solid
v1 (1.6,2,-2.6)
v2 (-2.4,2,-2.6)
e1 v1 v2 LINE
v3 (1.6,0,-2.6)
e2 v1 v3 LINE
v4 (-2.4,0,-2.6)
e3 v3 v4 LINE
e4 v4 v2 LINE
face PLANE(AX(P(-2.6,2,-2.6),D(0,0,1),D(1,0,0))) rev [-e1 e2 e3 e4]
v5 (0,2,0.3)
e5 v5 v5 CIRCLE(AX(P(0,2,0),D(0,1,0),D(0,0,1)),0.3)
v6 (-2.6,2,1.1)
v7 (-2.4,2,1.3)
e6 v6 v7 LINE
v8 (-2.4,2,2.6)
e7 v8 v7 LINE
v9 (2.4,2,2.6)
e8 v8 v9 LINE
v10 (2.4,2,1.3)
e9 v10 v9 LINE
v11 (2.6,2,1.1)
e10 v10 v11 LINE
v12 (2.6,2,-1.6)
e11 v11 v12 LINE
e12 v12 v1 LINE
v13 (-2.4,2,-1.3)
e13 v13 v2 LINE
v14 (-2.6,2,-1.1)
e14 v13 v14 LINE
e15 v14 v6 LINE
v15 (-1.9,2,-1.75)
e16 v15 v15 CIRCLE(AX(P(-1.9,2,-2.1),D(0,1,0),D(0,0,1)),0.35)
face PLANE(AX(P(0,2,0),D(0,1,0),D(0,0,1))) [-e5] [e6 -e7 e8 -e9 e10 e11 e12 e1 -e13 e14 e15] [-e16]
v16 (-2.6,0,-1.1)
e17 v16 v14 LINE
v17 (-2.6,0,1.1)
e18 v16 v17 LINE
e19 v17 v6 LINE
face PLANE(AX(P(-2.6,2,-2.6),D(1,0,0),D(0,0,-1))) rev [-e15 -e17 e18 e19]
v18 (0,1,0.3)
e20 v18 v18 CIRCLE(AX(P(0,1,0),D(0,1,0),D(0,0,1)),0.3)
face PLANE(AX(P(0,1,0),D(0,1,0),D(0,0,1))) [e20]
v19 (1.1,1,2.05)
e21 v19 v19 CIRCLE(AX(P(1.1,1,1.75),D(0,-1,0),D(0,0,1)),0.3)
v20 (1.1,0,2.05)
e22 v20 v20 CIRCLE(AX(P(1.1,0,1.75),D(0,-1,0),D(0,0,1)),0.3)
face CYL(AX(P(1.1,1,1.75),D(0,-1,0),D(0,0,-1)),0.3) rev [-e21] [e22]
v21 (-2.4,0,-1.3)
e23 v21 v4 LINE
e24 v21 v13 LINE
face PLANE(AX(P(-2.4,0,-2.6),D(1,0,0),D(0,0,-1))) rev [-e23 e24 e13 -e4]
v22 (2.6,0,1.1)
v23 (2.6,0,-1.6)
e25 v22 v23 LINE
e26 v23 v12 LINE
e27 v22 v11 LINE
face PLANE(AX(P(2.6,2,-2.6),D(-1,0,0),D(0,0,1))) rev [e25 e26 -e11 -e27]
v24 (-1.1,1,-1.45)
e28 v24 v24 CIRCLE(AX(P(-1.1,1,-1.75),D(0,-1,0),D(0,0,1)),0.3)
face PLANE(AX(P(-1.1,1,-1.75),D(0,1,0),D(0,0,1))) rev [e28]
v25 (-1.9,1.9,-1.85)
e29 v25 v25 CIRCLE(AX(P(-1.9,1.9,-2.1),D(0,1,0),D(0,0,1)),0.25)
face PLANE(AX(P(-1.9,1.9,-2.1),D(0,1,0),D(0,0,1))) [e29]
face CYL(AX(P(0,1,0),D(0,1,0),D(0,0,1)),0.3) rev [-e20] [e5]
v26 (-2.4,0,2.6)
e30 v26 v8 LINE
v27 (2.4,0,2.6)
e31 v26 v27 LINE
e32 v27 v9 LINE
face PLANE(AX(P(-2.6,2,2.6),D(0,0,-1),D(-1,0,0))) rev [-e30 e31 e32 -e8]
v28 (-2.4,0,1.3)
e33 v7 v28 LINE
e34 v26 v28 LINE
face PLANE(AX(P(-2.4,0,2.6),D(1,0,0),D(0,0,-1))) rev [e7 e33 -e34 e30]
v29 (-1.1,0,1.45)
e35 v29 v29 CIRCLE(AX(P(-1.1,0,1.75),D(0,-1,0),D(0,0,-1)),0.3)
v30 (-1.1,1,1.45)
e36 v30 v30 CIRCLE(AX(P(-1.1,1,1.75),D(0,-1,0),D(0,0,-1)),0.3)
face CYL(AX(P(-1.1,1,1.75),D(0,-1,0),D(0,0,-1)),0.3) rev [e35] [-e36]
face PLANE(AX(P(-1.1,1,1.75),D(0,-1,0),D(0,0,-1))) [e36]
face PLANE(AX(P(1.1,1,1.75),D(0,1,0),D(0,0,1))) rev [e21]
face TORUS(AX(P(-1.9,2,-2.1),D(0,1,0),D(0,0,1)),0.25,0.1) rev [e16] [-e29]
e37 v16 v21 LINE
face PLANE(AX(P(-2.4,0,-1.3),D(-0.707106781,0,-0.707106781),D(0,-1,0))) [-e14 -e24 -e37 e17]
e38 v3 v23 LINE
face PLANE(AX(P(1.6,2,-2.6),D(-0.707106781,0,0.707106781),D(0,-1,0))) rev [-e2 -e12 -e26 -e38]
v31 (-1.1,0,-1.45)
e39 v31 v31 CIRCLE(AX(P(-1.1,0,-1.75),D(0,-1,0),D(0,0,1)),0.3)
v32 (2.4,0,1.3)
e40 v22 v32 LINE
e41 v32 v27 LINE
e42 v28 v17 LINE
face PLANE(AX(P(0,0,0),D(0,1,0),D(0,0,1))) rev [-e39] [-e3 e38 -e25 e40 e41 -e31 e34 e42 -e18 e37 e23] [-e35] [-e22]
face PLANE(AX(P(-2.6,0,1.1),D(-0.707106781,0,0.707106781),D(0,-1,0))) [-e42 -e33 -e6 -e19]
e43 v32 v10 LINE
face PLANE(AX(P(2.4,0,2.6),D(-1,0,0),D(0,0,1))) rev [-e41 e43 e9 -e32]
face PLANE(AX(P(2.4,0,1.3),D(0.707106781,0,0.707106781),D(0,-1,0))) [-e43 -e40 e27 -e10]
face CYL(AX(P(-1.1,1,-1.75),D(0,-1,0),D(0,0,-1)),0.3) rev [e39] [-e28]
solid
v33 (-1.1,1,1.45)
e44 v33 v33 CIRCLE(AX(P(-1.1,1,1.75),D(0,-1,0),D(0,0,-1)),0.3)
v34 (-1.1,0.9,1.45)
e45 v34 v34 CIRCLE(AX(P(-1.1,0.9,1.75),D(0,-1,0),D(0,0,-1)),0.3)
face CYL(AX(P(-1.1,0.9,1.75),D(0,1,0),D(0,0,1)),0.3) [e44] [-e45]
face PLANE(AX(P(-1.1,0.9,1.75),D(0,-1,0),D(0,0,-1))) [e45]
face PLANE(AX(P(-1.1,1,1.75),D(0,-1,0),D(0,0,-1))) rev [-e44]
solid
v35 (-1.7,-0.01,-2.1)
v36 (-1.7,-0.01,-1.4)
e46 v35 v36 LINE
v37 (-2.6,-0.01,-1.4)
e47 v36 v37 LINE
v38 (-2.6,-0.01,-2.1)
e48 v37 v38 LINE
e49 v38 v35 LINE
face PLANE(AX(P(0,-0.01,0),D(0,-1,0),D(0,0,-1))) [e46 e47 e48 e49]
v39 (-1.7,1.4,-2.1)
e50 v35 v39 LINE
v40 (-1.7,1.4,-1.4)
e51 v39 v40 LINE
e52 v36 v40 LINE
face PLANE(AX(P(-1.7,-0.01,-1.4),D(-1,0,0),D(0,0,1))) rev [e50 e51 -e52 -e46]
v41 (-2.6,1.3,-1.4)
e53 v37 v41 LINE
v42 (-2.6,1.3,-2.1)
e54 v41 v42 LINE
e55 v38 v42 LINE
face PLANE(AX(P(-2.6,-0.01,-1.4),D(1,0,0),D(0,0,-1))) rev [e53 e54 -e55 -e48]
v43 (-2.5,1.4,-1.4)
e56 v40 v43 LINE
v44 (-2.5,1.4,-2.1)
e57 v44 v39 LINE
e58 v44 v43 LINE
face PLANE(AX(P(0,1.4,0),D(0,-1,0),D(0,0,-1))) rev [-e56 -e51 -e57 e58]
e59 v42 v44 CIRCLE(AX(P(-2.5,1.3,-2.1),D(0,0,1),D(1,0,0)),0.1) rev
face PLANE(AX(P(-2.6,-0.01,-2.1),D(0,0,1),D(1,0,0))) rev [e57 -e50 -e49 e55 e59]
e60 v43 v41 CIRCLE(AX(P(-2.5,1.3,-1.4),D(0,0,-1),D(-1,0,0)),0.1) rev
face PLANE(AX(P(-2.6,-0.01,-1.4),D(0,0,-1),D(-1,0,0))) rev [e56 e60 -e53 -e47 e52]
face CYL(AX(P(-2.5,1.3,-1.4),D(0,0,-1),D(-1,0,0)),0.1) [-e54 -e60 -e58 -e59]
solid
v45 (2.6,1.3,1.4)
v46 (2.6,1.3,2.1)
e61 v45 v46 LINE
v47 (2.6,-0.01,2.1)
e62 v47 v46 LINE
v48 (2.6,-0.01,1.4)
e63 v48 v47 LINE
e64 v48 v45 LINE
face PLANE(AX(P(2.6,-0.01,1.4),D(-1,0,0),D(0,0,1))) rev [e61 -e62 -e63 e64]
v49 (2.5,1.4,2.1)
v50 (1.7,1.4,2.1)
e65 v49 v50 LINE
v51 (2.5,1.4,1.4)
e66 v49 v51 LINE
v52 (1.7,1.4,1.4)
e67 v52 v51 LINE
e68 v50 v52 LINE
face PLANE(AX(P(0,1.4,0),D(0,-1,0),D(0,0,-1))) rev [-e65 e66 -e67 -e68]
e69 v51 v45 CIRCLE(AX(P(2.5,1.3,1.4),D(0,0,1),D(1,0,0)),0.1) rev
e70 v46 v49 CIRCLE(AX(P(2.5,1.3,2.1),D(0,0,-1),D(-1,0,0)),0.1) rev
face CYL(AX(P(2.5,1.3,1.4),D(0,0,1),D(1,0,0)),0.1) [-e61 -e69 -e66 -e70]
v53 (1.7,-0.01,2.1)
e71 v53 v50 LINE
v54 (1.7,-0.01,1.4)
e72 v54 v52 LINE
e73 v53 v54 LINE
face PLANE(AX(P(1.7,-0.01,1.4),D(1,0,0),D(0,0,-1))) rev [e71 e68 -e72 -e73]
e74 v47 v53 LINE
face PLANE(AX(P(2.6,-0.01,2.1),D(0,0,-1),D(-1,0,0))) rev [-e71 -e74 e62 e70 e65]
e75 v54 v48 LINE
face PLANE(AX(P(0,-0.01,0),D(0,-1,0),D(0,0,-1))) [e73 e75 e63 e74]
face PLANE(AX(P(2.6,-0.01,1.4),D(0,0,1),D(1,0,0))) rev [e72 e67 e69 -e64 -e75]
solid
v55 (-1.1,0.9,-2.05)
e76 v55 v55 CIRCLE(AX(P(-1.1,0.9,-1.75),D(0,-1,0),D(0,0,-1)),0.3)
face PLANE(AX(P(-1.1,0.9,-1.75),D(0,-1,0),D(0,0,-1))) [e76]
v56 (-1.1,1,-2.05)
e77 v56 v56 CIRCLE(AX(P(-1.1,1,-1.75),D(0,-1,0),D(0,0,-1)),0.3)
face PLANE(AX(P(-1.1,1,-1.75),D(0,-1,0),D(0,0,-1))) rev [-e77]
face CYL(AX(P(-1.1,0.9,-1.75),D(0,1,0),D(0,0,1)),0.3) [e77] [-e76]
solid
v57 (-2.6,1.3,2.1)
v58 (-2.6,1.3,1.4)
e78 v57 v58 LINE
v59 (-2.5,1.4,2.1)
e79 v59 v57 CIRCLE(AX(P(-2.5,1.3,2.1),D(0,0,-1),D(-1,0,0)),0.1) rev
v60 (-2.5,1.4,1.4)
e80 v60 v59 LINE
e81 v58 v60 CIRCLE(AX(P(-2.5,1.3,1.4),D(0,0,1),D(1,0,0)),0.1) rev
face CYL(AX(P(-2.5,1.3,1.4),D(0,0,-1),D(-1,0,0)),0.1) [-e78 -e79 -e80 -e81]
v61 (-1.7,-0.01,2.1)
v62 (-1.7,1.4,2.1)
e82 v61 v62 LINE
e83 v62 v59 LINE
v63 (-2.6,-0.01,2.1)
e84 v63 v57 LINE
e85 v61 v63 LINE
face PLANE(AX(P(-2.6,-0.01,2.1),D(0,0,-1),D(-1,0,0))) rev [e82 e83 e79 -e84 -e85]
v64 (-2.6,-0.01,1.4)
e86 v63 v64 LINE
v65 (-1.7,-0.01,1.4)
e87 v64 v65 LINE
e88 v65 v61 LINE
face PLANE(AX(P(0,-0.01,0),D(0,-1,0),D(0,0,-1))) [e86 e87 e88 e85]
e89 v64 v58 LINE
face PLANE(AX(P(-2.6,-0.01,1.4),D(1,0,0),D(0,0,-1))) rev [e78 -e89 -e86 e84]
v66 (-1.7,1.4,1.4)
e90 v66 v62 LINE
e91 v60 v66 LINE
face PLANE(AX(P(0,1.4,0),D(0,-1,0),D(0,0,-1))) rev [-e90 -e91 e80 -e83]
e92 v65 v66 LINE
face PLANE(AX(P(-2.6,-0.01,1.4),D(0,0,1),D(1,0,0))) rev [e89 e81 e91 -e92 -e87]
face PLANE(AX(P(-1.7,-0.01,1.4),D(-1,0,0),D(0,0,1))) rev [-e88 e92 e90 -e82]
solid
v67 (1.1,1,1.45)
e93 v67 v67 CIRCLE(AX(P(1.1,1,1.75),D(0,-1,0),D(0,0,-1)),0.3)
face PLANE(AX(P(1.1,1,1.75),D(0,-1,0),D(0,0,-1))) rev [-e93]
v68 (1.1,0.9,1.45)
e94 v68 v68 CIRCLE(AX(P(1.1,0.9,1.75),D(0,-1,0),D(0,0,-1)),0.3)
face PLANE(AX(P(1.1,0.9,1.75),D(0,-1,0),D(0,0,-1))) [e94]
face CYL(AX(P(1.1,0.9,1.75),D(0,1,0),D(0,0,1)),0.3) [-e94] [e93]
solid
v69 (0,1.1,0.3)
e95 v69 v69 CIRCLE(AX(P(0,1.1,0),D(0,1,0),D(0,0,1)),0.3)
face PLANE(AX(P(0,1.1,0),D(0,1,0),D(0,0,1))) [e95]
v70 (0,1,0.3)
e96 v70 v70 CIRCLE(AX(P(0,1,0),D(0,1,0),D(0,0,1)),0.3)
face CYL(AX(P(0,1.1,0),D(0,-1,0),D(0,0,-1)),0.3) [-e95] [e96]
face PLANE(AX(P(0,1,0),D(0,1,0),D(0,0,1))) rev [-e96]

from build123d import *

# Parameters (mm, degrees)
SKETCH_1_W             = 5.2
SKETCH_1_H             = 5.2
EXTRUDE_1_DEPTH        = 2
SKETCH_2_W             = 0.2
SKETCH_2_H             = 1.5
CUT_EXTRUDE_1_DEPTH    = 5.185689907
CHAMFER_1_SIZE         = 0.2
CHAMFER_2_SIZE         = 1
SKETCH_3_R             = 0.3
CUT_EXTRUDE_2_DEPTH    = 1
SKETCH_4_R             = 0.3
EXTRUDE_2_DEPTH        = 0.1
SKETCH_5_R             = 0.35
CUT_EXTRUDE_3_DEPTH    = 0.1
FILLET_1_R             = 0.1
EXTRUDE_3_DEPTH        = 0.01
EXTRUDE_3_DEPTH_BACK   = 1.4
SKETCH_6_W             = 0.9
SKETCH_6_H             = 0.7
EXTRUDE_3_2_DEPTH      = 0.01
EXTRUDE_3_2_DEPTH_BACK = 1.4
EXTRUDE_3_3_DEPTH      = 0.01
EXTRUDE_3_3_DEPTH_BACK = 1.4
SKETCH_7_R             = 0.3
CUT_EXTRUDE_4_DEPTH    = 1
SKETCH_8_R             = 0.3
EXTRUDE_4_DEPTH        = 0.1
EXTRUDE_4_2_DEPTH      = 0.1
EXTRUDE_4_3_DEPTH      = 0.1
FILLET_2_R             = 0.1
FILLET_3_R             = 0.1
FILLET_4_R             = 0.1


with BuildPart() as part:
    # 草图1 → 凸台-拉伸1 (new body)
    with BuildSketch(Plane(origin=(0, 0, 0), x_dir=(1, 0, 0), z_dir=(0, 1, 0))):
        Rectangle(SKETCH_1_W, SKETCH_1_H)
    extrude(amount=EXTRUDE_1_DEPTH)

    # 草图2 → 切除-拉伸1 (cut, through all)
    with BuildSketch(Plane(origin=(0, 2, 0), x_dir=(1, 0, 0), z_dir=(0, 1, 0))):
        with Locations((-2.5, -1.85)):
            Rectangle(SKETCH_2_W, SKETCH_2_H)
        with Locations((-2.5, 1.85)):
            Rectangle(SKETCH_2_W, SKETCH_2_H)
        with Locations((2.5, -1.85)):
            Rectangle(SKETCH_2_W, SKETCH_2_H)
    extrude(amount=-CUT_EXTRUDE_1_DEPTH, mode=Mode.SUBTRACT)

    # 倒角1
    chamfer_1_edges = [part.edges().sort_by_distance(p)[0] for p in [
        (2.4, 1, 1.1),
        (-2.4, 1, -1.1),
        (-2.4, 1, 1.1),
    ]]
    chamfer(chamfer_1_edges, length=CHAMFER_1_SIZE - 0.0001)  # a hair under: the kernel refuses the full size

    # 倒角2
    chamfer_2_edges = [part.edges().sort_by_distance(p)[0] for p in [
        (2.6, 1, -2.6),
    ]]
    chamfer(chamfer_2_edges, length=CHAMFER_2_SIZE)

    # 草图3 → 切除-拉伸2 (cut)
    with BuildSketch(Plane(origin=(0, 2, 0), x_dir=(1, 0, 0), z_dir=(0, 1, 0))):
        with Locations(Location((0, 0, 0), (0, 0, 270))):
            Circle(SKETCH_3_R)
    extrude(amount=-CUT_EXTRUDE_2_DEPTH, mode=Mode.SUBTRACT)

    # 草图5 → 切除-拉伸3 (cut)
    with BuildSketch(Plane(origin=(0, 2, 0), x_dir=(1, 0, 0), z_dir=(0, 1, 0))):
        with Locations(Location((-1.9, 2.1, 0), (0, 0, 270))):
            Circle(SKETCH_5_R)
    extrude(amount=-CUT_EXTRUDE_3_DEPTH, mode=Mode.SUBTRACT)

    # 圆角1
    fillet_1_edges = [part.edges().sort_by_distance(p)[0] for p in [
        (-1.9, 1.9, -2.45),
    ]]
    fillet(fillet_1_edges, radius=FILLET_1_R - 0.0001)  # a hair under: the kernel refuses the full size

    # 草图7 → 切除-拉伸4 (cut)
    with BuildSketch(Plane.XZ):
        with Locations(Location((-1.1, 1.75, 0), (0, 0, 270))):
            Circle(SKETCH_7_R)
        with Locations(Location((-1.1, -1.75, 0), (0, 0, 90))):
            Circle(SKETCH_7_R)
        with Locations(Location((1.1, 1.75, 0), (0, 0, 90))):
            Circle(SKETCH_7_R)
    extrude(amount=-CUT_EXTRUDE_4_DEPTH, mode=Mode.SUBTRACT)


with BuildPart() as body_2:
    # 草图4 → 凸台-拉伸2 (new body)
    with BuildSketch(Plane(origin=(0, 1, 0), x_dir=(1, 0, 0), z_dir=(0, 1, 0))):
        with Locations(Location((0, 0, 0), (0, 0, 270))):
            Circle(SKETCH_4_R)
    extrude(amount=EXTRUDE_2_DEPTH)


with BuildPart() as body_3:
    # 草图6 → 凸台-拉伸3 (new, two sides: drawn at the far end of the back side and taken through both)
    with BuildSketch(Plane.XZ.offset(-EXTRUDE_3_DEPTH_BACK)):
        with Locations((2.15, 1.75)):
            Rectangle(SKETCH_6_W, SKETCH_6_H)
    extrude(amount=EXTRUDE_3_DEPTH + EXTRUDE_3_DEPTH_BACK)

    # 圆角4
    fillet_4_edges = [body_3.edges().sort_by_distance(p)[0] for p in [
        (2.6, 1.4, 1.75),
    ]]
    fillet(fillet_4_edges, radius=FILLET_4_R)


with BuildPart() as body_4:
    # 草图6 → Extrude 3 2 (new, two sides: drawn at the far end of the back side and taken through both)
    with BuildSketch(Plane.XZ.offset(-EXTRUDE_3_2_DEPTH_BACK)):
        with Locations((-2.15, 1.75)):
            Rectangle(SKETCH_6_W, SKETCH_6_H)
    extrude(amount=EXTRUDE_3_2_DEPTH + EXTRUDE_3_2_DEPTH_BACK)

    # 圆角3
    fillet_3_edges = [body_4.edges().sort_by_distance(p)[0] for p in [
        (-2.6, 1.4, 1.75),
    ]]
    fillet(fillet_3_edges, radius=FILLET_3_R)


with BuildPart() as body_5:
    # 草图6 → Extrude 3 3 (new, two sides: drawn at the far end of the back side and taken through both)
    with BuildSketch(Plane.XZ.offset(-EXTRUDE_3_3_DEPTH_BACK)):
        with Locations((-2.15, -1.75)):
            Rectangle(SKETCH_6_W, SKETCH_6_H)
    extrude(amount=EXTRUDE_3_3_DEPTH + EXTRUDE_3_3_DEPTH_BACK)

    # 圆角2
    fillet_2_edges = [body_5.edges().sort_by_distance(p)[0] for p in [
        (-2.6, 1.4, -1.75),
    ]]
    fillet(fillet_2_edges, radius=FILLET_2_R)


with BuildPart() as body_6:
    # 草图8 → 凸台-拉伸4 (new body)
    with BuildSketch(Plane.XZ.offset(-1)):
        with Locations(Location((1.1, 1.75, 0), (0, 0, 270))):
            Circle(SKETCH_8_R)
    extrude(amount=EXTRUDE_4_DEPTH)


with BuildPart() as body_7:
    # 草图8 → Extrude 4 2 (new body)
    with BuildSketch(Plane.XZ.offset(-1)):
        with Locations(Location((-1.1, 1.75, 0), (0, 0, 270))):
            Circle(SKETCH_8_R)
    extrude(amount=EXTRUDE_4_2_DEPTH)


with BuildPart() as body_8:
    # 草图8 → Extrude 4 3 (new body)
    with BuildSketch(Plane.XZ.offset(-1)):
        with Locations(Location((-1.1, -1.75, 0), (0, 0, 270))):
            Circle(SKETCH_8_R)
    extrude(amount=EXTRUDE_4_3_DEPTH)


solid = Compound([part.part, body_2.part, body_3.part, body_4.part, body_5.part, body_6.part, body_7.part, body_8.part])
